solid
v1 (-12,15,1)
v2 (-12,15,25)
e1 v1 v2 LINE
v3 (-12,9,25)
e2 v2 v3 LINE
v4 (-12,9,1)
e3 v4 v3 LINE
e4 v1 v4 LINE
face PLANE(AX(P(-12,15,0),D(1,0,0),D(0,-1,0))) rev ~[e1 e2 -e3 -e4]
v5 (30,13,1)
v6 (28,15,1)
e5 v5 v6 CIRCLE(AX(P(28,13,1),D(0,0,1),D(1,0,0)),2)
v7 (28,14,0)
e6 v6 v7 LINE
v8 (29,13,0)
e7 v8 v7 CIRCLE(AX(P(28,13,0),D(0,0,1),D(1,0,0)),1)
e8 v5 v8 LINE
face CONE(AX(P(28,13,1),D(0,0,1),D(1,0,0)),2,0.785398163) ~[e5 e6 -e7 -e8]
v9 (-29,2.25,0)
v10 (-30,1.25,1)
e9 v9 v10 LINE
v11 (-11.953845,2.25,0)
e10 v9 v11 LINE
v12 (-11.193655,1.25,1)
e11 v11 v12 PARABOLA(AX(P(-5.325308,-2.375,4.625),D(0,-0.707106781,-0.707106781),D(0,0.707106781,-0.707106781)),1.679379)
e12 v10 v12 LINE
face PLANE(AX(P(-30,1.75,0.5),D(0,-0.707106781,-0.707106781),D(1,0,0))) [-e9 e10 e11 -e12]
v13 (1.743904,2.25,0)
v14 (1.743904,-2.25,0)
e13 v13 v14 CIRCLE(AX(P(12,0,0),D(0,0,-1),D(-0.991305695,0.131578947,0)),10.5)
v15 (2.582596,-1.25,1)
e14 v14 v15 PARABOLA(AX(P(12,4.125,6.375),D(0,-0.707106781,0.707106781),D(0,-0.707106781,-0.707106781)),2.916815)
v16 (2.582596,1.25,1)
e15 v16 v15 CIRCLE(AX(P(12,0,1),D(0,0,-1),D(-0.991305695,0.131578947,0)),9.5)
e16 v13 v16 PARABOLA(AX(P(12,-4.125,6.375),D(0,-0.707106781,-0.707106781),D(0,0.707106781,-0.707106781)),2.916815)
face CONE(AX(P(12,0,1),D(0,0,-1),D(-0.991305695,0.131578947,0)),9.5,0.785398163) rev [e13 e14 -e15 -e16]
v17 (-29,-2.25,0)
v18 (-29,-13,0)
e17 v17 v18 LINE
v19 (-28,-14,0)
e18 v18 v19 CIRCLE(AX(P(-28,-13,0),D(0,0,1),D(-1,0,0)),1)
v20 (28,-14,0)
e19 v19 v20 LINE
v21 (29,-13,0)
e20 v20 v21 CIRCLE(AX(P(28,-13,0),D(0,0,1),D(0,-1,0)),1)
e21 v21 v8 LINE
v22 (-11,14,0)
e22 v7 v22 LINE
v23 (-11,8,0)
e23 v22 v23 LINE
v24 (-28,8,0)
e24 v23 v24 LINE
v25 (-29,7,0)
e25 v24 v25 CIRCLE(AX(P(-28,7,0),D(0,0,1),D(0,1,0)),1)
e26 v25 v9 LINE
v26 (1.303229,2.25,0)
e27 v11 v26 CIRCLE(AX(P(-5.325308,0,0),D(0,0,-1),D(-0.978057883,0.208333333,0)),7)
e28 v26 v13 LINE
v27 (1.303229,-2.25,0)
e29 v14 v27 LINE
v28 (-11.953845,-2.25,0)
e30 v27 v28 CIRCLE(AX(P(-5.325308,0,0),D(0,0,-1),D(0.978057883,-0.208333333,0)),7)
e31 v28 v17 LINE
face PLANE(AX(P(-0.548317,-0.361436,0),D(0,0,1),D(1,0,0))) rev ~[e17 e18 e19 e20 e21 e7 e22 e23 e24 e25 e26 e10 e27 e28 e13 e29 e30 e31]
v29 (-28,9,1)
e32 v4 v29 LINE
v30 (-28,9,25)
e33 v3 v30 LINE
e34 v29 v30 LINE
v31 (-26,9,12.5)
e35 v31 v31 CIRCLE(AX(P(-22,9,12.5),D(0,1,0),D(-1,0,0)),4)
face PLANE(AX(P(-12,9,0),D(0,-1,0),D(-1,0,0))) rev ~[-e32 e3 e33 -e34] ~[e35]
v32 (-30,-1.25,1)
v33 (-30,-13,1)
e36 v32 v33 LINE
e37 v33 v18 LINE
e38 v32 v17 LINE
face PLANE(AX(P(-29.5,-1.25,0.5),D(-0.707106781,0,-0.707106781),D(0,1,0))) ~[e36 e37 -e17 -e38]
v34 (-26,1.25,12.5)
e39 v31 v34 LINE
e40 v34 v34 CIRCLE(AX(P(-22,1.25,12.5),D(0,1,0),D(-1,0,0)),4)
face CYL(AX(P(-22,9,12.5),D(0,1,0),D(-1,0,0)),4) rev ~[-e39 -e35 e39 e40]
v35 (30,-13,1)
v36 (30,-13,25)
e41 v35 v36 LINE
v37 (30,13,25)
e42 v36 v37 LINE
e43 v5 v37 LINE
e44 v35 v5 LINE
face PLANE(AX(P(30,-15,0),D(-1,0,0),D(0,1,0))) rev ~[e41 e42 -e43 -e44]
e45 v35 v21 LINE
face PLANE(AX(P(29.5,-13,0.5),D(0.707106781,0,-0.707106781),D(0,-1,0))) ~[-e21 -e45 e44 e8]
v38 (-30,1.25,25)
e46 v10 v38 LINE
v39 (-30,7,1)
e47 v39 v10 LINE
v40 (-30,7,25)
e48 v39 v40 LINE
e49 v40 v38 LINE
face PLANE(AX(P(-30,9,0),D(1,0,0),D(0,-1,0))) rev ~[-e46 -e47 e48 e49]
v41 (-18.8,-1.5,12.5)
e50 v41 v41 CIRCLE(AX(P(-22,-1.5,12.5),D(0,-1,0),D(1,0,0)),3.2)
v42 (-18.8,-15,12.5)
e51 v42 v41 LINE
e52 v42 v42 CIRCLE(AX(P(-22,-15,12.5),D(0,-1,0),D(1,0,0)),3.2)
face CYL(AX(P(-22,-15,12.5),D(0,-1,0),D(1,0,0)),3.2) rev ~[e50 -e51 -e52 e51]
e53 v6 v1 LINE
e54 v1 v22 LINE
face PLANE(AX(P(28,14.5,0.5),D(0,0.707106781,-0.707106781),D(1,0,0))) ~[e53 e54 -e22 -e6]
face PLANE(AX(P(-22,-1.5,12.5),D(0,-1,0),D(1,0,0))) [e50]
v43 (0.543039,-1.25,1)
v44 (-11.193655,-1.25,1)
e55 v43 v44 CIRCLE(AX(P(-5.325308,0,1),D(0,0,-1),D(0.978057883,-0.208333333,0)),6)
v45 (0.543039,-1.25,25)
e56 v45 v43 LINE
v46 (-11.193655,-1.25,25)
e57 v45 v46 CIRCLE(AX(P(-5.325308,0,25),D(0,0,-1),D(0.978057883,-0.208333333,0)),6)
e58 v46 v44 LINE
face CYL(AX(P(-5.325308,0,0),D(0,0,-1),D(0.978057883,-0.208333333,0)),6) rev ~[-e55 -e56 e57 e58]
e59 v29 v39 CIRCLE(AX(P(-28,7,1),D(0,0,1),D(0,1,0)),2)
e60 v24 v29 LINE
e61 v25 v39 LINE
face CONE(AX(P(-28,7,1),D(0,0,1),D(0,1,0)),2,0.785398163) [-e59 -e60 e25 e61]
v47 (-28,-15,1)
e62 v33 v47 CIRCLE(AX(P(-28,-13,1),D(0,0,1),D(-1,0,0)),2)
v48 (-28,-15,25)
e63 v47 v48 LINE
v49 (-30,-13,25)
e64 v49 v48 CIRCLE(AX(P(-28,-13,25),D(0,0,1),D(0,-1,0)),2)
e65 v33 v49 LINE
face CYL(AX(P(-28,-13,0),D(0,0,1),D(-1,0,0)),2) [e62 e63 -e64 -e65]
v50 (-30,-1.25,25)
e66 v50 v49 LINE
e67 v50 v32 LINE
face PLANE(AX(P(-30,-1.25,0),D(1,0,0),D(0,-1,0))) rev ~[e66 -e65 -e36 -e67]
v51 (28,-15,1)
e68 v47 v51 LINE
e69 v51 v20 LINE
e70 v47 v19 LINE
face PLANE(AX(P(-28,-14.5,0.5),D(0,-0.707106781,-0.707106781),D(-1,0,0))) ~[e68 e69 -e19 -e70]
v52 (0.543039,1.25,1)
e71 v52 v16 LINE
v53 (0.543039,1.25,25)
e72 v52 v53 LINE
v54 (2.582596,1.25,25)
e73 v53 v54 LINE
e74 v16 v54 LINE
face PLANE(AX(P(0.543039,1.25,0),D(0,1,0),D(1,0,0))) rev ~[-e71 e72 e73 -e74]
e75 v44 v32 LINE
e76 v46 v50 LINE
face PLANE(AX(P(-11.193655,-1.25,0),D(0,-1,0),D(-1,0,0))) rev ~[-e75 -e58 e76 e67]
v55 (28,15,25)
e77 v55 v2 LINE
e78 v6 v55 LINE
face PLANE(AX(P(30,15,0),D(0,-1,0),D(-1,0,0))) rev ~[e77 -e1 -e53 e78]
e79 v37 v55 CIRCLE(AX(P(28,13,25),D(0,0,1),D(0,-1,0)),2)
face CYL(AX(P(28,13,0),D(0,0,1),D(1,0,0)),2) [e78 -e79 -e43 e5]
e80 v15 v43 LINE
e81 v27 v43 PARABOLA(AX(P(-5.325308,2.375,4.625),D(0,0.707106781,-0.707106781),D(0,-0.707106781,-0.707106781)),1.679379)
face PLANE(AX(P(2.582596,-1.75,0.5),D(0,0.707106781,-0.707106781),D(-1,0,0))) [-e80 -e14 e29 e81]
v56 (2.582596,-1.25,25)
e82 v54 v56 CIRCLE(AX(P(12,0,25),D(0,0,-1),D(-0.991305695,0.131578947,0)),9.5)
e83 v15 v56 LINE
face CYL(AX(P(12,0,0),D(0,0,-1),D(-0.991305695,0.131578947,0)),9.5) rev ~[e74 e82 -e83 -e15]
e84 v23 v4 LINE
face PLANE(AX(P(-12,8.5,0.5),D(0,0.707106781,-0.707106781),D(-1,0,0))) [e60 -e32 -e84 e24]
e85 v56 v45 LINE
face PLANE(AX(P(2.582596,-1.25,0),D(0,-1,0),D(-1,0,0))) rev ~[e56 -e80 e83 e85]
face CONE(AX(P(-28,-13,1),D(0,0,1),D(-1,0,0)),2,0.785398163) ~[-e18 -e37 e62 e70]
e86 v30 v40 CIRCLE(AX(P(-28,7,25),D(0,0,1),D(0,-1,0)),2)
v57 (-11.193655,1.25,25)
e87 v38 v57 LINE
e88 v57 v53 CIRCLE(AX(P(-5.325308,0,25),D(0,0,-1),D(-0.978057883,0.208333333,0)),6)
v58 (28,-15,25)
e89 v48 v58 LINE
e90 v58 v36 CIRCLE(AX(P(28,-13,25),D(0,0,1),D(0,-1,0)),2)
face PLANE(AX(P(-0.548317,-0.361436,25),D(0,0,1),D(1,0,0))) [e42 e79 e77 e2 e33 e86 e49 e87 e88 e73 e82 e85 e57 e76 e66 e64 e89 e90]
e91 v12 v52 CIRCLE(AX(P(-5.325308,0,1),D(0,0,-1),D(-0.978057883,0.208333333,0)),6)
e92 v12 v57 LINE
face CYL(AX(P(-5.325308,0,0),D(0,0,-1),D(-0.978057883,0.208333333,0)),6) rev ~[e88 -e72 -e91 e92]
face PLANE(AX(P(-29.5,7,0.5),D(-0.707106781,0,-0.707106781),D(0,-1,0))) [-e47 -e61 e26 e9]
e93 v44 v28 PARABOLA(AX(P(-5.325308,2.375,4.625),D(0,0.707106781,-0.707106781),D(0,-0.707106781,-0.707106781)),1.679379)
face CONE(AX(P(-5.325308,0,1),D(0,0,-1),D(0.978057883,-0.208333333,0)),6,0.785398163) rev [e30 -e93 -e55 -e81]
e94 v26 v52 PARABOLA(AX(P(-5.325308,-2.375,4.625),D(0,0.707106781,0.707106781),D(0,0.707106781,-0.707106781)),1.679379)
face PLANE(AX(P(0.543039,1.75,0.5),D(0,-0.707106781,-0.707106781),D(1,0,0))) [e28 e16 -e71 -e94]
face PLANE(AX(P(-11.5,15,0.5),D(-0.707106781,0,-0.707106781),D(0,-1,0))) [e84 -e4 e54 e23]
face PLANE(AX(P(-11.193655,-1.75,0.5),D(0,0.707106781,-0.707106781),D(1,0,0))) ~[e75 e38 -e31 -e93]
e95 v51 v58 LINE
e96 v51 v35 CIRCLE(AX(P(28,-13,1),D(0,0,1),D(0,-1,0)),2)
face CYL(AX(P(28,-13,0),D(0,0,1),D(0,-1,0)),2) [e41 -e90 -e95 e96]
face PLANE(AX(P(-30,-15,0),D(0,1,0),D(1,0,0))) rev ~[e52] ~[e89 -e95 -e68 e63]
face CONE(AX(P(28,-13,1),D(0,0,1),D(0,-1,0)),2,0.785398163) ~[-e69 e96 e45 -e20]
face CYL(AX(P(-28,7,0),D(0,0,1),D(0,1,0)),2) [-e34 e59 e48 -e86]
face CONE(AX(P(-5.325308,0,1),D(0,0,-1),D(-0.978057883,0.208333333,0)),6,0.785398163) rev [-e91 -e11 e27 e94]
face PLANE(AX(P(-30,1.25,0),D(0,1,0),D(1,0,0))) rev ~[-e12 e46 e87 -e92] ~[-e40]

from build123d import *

# Parameters (mm, degrees)
F1_DEPTH = 15
F2_DEPTH = 25
F3_DEPTH = 25
F4_R     = 4
F5_DEPTH = 9
F6_R     = 3.2
F7_DEPTH = 13.5
F8_R     = 2
F9_SIZE  = 1


# Not quite as in the source:
# - a feature names something its author has since deleted; it is built from what else it names


with BuildPart() as f1:
    # F0 (on Top) → F1 (new body)
    with BuildSketch(Plane.XY):
        with BuildLine():
            Line((-30, -1.25), (-30, -15))
            Line((-30, -15), (30, -15))
            Line((30, -15), (30, 15))
            Line((30, 15), (-12, 15))
            Line((-12, 15), (-12, 9))
            Line((-12, 9), (-30, 9))
            Line((-30, 9), (-30, 1.25))
            Line((-30, 1.25), (-11.1936553667, 1.25))
            ThreePointArc((-11.1936553667, 1.25), (-5.3253080696, 6), (0.5430392276, 1.25))
            Line((0.5430392276, 1.25), (2.5825958991, 1.25))
            ThreePointArc((2.5825958991, 1.25), (21.5, 0), (2.5825958991, -1.25))
            Line((2.5825958991, -1.25), (0.5430392276, -1.25))
            ThreePointArc((0.5430392276, -1.25), (-5.3253080696, -6), (-11.1936553667, -1.25))
            Line((-11.1936553667, -1.25), (-30, -1.25))
        make_face()
    extrude(amount=F1_DEPTH)

    # F0 (on Top) + F1_face (on face) → F2 (join)
    with BuildSketch(Plane.XY):
        with BuildLine():
            Line((-30, -1.25), (-30, -15))
            Line((-30, -15), (30, -15))
            Line((30, -15), (30, 15))
            Line((30, 15), (-12, 15))
            Line((-12, 15), (-12, 9))
            Line((-12, 9), (-30, 9))
            Line((-30, 9), (-30, 1.25))
            Line((-30, 1.25), (-11.1936553667, 1.25))
            ThreePointArc((-11.1936553667, 1.25), (-5.3253080696, 6), (0.5430392276, 1.25))
            Line((0.5430392276, 1.25), (2.5825958991, 1.25))
            ThreePointArc((2.5825958991, 1.25), (21.5, 0), (2.5825958991, -1.25))
            Line((2.5825958991, -1.25), (0.5430392276, -1.25))
            ThreePointArc((0.5430392276, -1.25), (-5.3253080696, -6), (-11.1936553667, -1.25))
            Line((-11.1936553667, -1.25), (-30, -1.25))
        make_face()
    with BuildSketch(Plane(origin=(0.3427711831, -1.0419373609, 0), x_dir=(1, 0, 0), z_dir=(0, 0, -1))):
        with BuildLine():
            ThreePointArc((2.239824716, 0.2080626391), (21.1572288169, -1.0419373609), (2.239824716, -2.2919373609))
            Line((2.239824716, -2.2919373609), (0.2002680445, -2.2919373609))
            ThreePointArc((0.2002680445, -2.2919373609), (-5.6680792527, -7.0419373609), (-11.5364265498, -2.2919373609))
            Line((-11.5364265498, -2.2919373609), (-30.3427711831, -2.2919373609))
            Line((-30.3427711831, -2.2919373609), (-30.3427711831, -10.0419373609))
            Line((-30.3427711831, -10.0419373609), (-12.3427711831, -10.0419373609))
            Line((-12.3427711831, -10.0419373609), (-12.3427711831, -16.0419373609))
            Line((-12.3427711831, -16.0419373609), (29.6572288169, -16.0419373609))
            Line((29.6572288169, -16.0419373609), (29.6572288169, 13.9580626391))
            Line((29.6572288169, 13.9580626391), (-30.3427711831, 13.9580626391))
            Line((-30.3427711831, 13.9580626391), (-30.3427711831, 0.2080626391))
            Line((-30.3427711831, 0.2080626391), (-11.5364265498, 0.2080626391))
            ThreePointArc((-11.5364265498, 0.2080626391), (-5.6680792527, 4.9580626391), (0.2002680445, 0.2080626391))
            Line((0.2002680445, 0.2080626391), (2.239824716, 0.2080626391))
        make_face()
    extrude(amount=F2_DEPTH, dir=(0, 0, 1))

    # F0 (on Top) → F3 (join)
    with BuildSketch(Plane.XY):
        with BuildLine():
            Line((-30, -1.25), (-30, -15))
            Line((-30, -15), (30, -15))
            Line((30, -15), (30, 15))
            Line((30, 15), (-12, 15))
            Line((-12, 15), (-12, 9))
            Line((-12, 9), (-30, 9))
            Line((-30, 9), (-30, 1.25))
            Line((-30, 1.25), (-11.1936553667, 1.25))
            ThreePointArc((-11.1936553667, 1.25), (-5.3253080696, 6), (0.5430392276, 1.25))
            Line((0.5430392276, 1.25), (2.5825958991, 1.25))
            ThreePointArc((2.5825958991, 1.25), (21.5, 0), (2.5825958991, -1.25))
            Line((2.5825958991, -1.25), (0.5430392276, -1.25))
            ThreePointArc((0.5430392276, -1.25), (-5.3253080696, -6), (-11.1936553667, -1.25))
            Line((-11.1936553667, -1.25), (-30, -1.25))
        make_face()
    extrude(amount=F3_DEPTH)

    # F4 (on face) → F5 (cut)
    with BuildSketch(Plane(origin=(0, 9, 0), x_dir=(-1, 0, 0), z_dir=(0, 1, 0))):
        with Locations((22, 12.5)):
            Circle(F4_R)
    extrude(amount=-F5_DEPTH, mode=Mode.SUBTRACT)

    # F6 (on face) → F7 (cut)
    with BuildSketch(Plane.XZ.offset(15)):
        with Locations((-22, 12.5)):
            Circle(F6_R)
    extrude(amount=-F7_DEPTH, mode=Mode.SUBTRACT)

    # F8
    f8_edges = [f1.edges().sort_by_distance(p)[0] for p in [
        (30, -15, 12.5),
        (30, 15, 12.5),
        (-30, -15, 12.5),
        (-30, 9, 12.5),
    ]]
    fillet(f8_edges, radius=F8_R)

    # F9
    f9_edges = [f1.edges().sort_by_distance(p)[0] for p in [
        (-30, -7.125, 0),
        (-29.414214, -14.414214, 0),
        (-20.596828, -1.25, 0),
        (0, -15, 0),
        (-5.325308, -6, 0),
        (29.414214, -14.414214, 0),
        (1.562818, -1.25, 0),
        (30, 0, 0),
        (21.5, 0, 0),
        (29.414214, 14.414214, 0),
        (1.562818, 1.25, 0),
        (8, 15, 0),
        (-5.325308, 6, 0),
        (-12, 12, 0),
        (-20.596828, 1.25, 0),
        (-20, 9, 0),
        (-30, 4.125, 0),
        (-29.414214, 8.414214, 0),
    ]]
    chamfer(f9_edges, length=F9_SIZE)


solid = f1.part
